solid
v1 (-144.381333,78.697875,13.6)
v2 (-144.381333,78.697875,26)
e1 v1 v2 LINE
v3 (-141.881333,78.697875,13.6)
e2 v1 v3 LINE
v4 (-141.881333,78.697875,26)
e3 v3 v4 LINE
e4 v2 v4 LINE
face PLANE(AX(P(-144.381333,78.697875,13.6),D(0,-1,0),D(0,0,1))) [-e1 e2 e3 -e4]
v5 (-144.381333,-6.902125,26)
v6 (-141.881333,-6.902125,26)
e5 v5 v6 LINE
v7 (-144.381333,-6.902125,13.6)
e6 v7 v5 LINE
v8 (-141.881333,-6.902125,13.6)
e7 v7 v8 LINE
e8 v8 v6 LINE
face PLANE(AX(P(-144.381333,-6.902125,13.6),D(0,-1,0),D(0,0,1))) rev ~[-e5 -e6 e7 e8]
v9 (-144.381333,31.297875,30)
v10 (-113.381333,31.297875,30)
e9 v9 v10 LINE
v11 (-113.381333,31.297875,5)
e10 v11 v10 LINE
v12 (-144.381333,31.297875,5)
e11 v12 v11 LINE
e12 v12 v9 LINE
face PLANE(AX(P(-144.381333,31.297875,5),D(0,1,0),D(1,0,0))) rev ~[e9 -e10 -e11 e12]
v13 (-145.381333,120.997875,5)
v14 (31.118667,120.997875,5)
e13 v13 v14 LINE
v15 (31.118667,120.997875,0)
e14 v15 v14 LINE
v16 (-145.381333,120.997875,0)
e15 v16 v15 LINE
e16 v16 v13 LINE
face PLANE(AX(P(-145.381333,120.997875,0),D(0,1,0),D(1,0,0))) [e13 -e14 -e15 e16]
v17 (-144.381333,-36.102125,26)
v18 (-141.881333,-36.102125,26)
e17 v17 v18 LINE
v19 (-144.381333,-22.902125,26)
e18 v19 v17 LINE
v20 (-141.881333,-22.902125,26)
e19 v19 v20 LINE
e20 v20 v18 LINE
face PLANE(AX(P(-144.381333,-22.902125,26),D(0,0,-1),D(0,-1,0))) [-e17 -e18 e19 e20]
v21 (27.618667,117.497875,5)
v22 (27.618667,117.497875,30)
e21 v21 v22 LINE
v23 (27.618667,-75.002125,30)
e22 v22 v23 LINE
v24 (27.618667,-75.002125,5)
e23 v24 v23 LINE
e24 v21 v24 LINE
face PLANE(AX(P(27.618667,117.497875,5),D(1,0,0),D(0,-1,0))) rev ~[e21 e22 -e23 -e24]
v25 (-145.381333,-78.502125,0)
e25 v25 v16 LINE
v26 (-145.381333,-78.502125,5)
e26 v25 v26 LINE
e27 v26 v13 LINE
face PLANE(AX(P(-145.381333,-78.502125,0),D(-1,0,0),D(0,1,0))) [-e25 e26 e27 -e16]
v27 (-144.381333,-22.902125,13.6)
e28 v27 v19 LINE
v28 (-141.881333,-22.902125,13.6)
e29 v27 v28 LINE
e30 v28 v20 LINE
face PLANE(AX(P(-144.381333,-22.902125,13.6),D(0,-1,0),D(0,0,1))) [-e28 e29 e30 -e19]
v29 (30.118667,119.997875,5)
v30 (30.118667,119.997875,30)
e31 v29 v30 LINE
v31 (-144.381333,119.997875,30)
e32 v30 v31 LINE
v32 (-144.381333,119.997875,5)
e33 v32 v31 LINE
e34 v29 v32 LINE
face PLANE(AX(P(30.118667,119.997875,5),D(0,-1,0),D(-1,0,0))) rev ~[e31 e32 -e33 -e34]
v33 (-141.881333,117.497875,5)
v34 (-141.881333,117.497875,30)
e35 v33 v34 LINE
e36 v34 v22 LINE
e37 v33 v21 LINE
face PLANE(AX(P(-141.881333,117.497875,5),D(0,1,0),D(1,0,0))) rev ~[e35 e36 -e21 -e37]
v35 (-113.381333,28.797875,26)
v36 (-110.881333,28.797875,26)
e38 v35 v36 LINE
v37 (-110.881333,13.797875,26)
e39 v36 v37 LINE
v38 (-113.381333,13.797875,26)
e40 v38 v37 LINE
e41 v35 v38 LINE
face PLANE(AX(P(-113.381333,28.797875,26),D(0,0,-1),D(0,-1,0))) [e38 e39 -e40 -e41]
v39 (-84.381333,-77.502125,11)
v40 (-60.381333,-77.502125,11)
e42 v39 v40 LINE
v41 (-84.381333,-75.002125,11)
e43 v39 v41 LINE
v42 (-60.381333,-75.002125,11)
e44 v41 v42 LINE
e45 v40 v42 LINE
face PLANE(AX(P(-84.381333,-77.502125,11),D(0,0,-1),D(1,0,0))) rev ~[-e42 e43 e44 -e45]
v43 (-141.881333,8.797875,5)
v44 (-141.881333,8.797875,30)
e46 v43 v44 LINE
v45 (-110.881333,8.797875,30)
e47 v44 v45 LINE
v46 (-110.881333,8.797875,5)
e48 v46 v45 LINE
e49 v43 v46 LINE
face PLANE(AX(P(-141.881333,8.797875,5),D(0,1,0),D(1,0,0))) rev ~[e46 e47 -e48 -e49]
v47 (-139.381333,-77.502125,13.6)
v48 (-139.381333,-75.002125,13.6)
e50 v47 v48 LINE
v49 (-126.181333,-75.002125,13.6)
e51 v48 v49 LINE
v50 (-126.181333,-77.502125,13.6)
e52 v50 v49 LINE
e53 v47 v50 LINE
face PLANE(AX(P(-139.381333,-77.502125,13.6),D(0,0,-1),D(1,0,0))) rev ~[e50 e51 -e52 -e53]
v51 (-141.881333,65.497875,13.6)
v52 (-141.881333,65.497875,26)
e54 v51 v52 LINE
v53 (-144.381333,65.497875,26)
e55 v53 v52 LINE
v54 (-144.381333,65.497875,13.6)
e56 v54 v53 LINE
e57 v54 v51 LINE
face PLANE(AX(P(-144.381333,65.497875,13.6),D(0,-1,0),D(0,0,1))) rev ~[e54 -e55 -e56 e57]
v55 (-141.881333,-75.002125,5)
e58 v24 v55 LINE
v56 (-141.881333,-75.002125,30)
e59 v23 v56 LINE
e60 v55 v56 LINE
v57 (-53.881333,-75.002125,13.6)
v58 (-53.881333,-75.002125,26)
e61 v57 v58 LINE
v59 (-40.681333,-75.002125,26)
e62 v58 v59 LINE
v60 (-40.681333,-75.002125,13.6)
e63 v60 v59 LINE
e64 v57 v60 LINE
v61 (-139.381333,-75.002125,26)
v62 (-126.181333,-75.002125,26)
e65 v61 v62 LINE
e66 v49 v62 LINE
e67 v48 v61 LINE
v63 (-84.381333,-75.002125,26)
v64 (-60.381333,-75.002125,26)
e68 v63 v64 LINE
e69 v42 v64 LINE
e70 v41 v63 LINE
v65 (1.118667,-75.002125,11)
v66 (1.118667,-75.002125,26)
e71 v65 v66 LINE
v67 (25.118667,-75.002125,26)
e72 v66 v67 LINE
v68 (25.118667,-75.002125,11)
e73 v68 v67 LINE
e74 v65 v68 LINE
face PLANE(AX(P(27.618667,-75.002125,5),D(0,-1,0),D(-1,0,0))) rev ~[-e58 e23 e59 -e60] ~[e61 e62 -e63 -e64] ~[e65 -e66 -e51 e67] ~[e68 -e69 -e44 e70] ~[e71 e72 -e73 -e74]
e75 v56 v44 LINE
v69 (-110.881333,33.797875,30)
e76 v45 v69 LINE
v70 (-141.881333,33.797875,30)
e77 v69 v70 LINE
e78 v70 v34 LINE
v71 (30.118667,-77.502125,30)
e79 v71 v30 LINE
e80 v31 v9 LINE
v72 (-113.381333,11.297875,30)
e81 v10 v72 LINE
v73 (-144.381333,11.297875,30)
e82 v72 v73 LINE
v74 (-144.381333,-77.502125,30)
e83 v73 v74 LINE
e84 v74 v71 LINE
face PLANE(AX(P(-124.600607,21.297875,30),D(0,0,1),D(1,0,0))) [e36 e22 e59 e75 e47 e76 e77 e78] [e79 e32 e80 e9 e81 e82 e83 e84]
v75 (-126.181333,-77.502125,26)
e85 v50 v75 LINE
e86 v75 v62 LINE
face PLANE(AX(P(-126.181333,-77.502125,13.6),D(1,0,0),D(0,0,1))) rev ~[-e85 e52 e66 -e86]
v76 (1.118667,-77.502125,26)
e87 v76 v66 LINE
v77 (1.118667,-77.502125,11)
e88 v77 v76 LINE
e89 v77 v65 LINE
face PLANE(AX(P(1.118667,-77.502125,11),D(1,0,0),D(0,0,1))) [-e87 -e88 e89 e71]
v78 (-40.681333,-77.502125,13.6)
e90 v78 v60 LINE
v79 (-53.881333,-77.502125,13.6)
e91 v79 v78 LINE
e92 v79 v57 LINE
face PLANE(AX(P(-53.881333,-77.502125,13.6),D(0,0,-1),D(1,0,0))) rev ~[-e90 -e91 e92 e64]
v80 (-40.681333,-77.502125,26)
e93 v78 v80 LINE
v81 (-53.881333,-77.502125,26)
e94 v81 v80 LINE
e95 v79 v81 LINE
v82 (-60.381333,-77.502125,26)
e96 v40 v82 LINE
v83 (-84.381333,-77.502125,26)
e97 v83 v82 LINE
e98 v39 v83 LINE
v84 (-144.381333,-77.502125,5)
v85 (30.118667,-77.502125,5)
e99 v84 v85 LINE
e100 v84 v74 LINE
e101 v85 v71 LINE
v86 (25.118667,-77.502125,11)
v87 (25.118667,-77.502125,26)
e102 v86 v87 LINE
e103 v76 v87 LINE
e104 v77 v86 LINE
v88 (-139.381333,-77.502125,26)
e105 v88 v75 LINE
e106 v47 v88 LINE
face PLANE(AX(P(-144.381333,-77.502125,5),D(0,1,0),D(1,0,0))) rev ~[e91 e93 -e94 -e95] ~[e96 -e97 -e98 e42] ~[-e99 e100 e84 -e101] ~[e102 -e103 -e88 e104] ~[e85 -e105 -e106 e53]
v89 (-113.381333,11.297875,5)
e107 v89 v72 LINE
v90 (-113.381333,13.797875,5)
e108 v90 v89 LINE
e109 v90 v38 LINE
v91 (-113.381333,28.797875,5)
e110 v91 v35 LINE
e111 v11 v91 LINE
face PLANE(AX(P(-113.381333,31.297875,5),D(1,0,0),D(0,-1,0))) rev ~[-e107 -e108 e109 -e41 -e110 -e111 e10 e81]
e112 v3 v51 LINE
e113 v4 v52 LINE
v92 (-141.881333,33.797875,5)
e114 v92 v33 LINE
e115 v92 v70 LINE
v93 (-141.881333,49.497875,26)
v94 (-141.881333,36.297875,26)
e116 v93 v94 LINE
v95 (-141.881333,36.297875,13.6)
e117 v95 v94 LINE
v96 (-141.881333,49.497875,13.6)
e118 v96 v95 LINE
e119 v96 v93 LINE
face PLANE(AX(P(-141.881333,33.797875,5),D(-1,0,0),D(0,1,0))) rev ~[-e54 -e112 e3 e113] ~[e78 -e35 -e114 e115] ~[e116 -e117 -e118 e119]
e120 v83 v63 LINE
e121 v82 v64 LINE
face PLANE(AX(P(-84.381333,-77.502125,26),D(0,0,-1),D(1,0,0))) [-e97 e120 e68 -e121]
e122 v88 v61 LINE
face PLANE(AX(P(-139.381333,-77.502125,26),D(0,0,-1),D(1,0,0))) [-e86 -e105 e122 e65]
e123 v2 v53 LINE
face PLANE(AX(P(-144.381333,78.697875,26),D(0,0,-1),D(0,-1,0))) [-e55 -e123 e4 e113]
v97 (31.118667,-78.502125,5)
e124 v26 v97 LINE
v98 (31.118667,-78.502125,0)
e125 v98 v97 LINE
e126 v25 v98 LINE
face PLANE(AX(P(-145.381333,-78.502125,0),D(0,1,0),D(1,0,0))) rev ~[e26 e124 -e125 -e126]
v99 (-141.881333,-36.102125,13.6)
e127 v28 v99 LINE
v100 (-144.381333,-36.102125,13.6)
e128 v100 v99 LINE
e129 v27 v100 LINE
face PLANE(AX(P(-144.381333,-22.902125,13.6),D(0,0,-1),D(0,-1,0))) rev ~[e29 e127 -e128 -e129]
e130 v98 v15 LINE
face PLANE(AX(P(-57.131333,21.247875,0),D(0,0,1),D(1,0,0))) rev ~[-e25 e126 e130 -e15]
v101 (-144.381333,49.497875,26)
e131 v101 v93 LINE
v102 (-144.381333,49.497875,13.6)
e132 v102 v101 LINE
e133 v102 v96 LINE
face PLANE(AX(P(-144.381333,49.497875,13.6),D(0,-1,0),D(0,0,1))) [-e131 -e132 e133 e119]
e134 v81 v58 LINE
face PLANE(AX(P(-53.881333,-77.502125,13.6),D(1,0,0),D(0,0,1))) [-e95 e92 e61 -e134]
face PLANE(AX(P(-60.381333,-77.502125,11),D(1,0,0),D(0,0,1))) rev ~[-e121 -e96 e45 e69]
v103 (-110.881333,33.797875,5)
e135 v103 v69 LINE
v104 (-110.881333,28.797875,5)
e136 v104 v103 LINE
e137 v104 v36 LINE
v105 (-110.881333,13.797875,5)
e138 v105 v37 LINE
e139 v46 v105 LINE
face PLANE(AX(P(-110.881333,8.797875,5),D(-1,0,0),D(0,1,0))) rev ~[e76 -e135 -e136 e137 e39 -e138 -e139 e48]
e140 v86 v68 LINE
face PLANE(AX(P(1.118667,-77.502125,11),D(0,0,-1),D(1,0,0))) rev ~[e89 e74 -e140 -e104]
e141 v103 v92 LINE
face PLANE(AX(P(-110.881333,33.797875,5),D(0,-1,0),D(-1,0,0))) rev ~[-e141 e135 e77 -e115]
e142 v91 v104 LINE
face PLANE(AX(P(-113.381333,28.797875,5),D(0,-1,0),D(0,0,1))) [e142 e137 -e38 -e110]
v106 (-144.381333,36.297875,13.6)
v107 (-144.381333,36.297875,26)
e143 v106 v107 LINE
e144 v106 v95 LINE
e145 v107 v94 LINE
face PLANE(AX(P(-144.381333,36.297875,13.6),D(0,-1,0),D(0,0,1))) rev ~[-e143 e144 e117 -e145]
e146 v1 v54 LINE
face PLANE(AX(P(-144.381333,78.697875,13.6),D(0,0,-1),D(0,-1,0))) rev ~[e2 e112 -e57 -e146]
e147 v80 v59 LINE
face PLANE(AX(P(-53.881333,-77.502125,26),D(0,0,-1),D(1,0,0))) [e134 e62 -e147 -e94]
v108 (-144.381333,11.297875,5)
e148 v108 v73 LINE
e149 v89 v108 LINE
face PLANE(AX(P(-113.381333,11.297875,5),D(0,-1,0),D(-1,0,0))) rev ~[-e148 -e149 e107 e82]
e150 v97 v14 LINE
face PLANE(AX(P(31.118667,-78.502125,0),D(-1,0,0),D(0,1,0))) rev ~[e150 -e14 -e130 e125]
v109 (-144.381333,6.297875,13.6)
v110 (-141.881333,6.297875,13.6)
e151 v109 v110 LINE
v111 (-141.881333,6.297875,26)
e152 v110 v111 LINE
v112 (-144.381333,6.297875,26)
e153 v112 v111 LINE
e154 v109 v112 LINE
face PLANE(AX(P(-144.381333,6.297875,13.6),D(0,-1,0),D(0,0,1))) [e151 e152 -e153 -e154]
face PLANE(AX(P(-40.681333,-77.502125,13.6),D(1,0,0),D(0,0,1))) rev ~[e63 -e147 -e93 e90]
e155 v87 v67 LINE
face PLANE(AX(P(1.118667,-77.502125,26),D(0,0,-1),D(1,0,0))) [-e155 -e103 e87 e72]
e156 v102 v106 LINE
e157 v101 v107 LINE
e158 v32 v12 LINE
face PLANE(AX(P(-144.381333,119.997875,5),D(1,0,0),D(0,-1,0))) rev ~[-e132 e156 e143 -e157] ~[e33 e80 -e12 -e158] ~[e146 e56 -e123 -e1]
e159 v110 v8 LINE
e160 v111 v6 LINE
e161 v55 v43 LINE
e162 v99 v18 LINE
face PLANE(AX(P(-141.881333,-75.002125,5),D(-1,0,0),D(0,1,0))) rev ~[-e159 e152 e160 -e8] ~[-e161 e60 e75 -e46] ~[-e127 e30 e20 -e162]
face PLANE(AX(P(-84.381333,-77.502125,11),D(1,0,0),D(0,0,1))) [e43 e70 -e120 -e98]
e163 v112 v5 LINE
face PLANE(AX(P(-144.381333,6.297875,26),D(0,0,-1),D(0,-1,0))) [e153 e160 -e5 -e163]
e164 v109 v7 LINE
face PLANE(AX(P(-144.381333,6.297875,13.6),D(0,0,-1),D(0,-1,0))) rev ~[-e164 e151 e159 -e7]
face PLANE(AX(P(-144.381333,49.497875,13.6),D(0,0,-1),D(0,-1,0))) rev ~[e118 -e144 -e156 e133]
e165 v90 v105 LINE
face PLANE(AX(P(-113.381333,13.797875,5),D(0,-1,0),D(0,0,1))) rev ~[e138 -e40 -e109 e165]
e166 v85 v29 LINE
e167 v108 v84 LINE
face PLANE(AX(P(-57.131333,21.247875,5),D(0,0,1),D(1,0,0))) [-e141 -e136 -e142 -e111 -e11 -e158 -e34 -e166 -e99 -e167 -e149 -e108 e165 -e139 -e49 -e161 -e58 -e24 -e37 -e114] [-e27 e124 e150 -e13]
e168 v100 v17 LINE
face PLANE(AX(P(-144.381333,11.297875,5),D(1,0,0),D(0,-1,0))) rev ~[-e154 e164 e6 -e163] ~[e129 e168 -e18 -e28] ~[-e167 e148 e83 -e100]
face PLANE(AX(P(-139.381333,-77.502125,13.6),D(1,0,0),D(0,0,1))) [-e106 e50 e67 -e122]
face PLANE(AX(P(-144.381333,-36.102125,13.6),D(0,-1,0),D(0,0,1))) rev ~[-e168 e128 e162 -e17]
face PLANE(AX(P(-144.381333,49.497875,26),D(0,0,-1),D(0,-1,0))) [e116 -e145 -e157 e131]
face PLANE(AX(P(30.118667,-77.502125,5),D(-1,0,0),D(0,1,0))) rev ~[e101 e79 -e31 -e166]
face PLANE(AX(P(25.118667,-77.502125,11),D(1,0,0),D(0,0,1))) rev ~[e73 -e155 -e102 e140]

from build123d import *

# Parameters (mm, degrees)
F0_W     = 176.5
F0_H     = 199.5
F1_DEPTH = 5
F2_W     = 2.5
F2_H     = 83.7
F2_H_2   = 83.8
F3_DEPTH = 25
F4_W     = 15
F4_H     = 21
F5_DEPTH = 2.5
F6_W     = 13.2
F6_H     = 12.4
F7_DEPTH = 2.5
F8_W     = 13.2
F8_H     = 12.4
F8_W_2   = 24
F8_H_2   = 15
F9_DEPTH = 2.5


# Not quite as in the source:
# - a feature names something its author has since deleted; it is built from what else it names


with BuildPart() as f1:
    # F0 (on Top) → F1 (new body)
    with BuildSketch(Plane.XY):
        with Locations((-57.1313334405, 21.2478748113)):
            Rectangle(F0_W, F0_H)
    extrude(amount=F1_DEPTH)

    # F2 (on face) → F3 (join)
    with BuildSketch(Plane.XY.offset(5)):
        Polygon((-141.8813334405, 33.7978748113), (-144.3813334405, 33.7978748113), (-144.3813334405, 31.2978748113), (-113.3813334405, 31.2978748113), (-113.3813334405, 11.2978748113), (-144.3813334405, 11.2978748113), (-144.3813334405, 8.7978748113), (-141.8813334405, 8.7978748113), (-110.8813334405, 8.7978748113), (-110.8813334405, 33.7978748113), align=None)
        with Locations((-143.1313334405, 75.6478748113)):
            Rectangle(F2_W, F2_H)
        Polygon((30.1186665595, 119.9978748113), (-144.3813334405, 119.9978748113), (-144.3813334405, 117.4978748113), (-141.8813334405, 117.4978748113), (27.6186665595, 117.4978748113), (27.6186665595, -75.0021251887), (-141.8813334405, -75.0021251887), (-144.3813334405, -75.0021251887), (-144.3813334405, -77.5021251887), (30.1186665595, -77.5021251887), align=None)
        with Locations((-143.1313334405, -33.1021251887)):
            Rectangle(F2_W, F2_H_2)
    extrude(amount=F3_DEPTH)

    # F4 (on face) → F5 (cut, through all)
    with BuildSketch(Plane(origin=(-113.3813334405, 0, 0), x_dir=(0, -1, 0), z_dir=(-1, 0, 0))):
        with Locations((-21.2978748113, 15.5)):
            Rectangle(F4_W, F4_H)
    extrude(amount=-F5_DEPTH, mode=Mode.SUBTRACT)

    # F6 (on face) → F7 (cut, through all)
    with BuildSketch(Plane(origin=(-144.3813334405, 0, 0), x_dir=(0, -1, 0), z_dir=(-1, 0, 0))):
        with Locations((-72.0978748113, 19.8)):
            Rectangle(F6_W, F6_H)
        with Locations((-42.8978748113, 19.8)):
            Rectangle(F6_W, F6_H)
        with Locations((0.3021251887, 19.8)):
            Rectangle(F6_W, F6_H)
        with Locations((29.5021251887, 19.8)):
            Rectangle(F6_W, F6_H)
    extrude(amount=-F7_DEPTH, mode=Mode.SUBTRACT)

    # F8 (on face) → F9 (cut, through all)
    with BuildSketch(Plane.XZ.offset(77.5021251887)):
        with Locations((-132.7813334405, 19.8)):
            Rectangle(F8_W, F8_H)
        with Locations((-72.3813334405, 18.5)):
            Rectangle(F8_W_2, F8_H_2)
        with Locations((-47.2813334405, 19.8)):
            Rectangle(F8_W, F8_H)
        with Locations((13.1186665595, 18.5)):
            Rectangle(F8_W_2, F8_H_2)
    extrude(amount=-F9_DEPTH, mode=Mode.SUBTRACT)


solid = f1.part
